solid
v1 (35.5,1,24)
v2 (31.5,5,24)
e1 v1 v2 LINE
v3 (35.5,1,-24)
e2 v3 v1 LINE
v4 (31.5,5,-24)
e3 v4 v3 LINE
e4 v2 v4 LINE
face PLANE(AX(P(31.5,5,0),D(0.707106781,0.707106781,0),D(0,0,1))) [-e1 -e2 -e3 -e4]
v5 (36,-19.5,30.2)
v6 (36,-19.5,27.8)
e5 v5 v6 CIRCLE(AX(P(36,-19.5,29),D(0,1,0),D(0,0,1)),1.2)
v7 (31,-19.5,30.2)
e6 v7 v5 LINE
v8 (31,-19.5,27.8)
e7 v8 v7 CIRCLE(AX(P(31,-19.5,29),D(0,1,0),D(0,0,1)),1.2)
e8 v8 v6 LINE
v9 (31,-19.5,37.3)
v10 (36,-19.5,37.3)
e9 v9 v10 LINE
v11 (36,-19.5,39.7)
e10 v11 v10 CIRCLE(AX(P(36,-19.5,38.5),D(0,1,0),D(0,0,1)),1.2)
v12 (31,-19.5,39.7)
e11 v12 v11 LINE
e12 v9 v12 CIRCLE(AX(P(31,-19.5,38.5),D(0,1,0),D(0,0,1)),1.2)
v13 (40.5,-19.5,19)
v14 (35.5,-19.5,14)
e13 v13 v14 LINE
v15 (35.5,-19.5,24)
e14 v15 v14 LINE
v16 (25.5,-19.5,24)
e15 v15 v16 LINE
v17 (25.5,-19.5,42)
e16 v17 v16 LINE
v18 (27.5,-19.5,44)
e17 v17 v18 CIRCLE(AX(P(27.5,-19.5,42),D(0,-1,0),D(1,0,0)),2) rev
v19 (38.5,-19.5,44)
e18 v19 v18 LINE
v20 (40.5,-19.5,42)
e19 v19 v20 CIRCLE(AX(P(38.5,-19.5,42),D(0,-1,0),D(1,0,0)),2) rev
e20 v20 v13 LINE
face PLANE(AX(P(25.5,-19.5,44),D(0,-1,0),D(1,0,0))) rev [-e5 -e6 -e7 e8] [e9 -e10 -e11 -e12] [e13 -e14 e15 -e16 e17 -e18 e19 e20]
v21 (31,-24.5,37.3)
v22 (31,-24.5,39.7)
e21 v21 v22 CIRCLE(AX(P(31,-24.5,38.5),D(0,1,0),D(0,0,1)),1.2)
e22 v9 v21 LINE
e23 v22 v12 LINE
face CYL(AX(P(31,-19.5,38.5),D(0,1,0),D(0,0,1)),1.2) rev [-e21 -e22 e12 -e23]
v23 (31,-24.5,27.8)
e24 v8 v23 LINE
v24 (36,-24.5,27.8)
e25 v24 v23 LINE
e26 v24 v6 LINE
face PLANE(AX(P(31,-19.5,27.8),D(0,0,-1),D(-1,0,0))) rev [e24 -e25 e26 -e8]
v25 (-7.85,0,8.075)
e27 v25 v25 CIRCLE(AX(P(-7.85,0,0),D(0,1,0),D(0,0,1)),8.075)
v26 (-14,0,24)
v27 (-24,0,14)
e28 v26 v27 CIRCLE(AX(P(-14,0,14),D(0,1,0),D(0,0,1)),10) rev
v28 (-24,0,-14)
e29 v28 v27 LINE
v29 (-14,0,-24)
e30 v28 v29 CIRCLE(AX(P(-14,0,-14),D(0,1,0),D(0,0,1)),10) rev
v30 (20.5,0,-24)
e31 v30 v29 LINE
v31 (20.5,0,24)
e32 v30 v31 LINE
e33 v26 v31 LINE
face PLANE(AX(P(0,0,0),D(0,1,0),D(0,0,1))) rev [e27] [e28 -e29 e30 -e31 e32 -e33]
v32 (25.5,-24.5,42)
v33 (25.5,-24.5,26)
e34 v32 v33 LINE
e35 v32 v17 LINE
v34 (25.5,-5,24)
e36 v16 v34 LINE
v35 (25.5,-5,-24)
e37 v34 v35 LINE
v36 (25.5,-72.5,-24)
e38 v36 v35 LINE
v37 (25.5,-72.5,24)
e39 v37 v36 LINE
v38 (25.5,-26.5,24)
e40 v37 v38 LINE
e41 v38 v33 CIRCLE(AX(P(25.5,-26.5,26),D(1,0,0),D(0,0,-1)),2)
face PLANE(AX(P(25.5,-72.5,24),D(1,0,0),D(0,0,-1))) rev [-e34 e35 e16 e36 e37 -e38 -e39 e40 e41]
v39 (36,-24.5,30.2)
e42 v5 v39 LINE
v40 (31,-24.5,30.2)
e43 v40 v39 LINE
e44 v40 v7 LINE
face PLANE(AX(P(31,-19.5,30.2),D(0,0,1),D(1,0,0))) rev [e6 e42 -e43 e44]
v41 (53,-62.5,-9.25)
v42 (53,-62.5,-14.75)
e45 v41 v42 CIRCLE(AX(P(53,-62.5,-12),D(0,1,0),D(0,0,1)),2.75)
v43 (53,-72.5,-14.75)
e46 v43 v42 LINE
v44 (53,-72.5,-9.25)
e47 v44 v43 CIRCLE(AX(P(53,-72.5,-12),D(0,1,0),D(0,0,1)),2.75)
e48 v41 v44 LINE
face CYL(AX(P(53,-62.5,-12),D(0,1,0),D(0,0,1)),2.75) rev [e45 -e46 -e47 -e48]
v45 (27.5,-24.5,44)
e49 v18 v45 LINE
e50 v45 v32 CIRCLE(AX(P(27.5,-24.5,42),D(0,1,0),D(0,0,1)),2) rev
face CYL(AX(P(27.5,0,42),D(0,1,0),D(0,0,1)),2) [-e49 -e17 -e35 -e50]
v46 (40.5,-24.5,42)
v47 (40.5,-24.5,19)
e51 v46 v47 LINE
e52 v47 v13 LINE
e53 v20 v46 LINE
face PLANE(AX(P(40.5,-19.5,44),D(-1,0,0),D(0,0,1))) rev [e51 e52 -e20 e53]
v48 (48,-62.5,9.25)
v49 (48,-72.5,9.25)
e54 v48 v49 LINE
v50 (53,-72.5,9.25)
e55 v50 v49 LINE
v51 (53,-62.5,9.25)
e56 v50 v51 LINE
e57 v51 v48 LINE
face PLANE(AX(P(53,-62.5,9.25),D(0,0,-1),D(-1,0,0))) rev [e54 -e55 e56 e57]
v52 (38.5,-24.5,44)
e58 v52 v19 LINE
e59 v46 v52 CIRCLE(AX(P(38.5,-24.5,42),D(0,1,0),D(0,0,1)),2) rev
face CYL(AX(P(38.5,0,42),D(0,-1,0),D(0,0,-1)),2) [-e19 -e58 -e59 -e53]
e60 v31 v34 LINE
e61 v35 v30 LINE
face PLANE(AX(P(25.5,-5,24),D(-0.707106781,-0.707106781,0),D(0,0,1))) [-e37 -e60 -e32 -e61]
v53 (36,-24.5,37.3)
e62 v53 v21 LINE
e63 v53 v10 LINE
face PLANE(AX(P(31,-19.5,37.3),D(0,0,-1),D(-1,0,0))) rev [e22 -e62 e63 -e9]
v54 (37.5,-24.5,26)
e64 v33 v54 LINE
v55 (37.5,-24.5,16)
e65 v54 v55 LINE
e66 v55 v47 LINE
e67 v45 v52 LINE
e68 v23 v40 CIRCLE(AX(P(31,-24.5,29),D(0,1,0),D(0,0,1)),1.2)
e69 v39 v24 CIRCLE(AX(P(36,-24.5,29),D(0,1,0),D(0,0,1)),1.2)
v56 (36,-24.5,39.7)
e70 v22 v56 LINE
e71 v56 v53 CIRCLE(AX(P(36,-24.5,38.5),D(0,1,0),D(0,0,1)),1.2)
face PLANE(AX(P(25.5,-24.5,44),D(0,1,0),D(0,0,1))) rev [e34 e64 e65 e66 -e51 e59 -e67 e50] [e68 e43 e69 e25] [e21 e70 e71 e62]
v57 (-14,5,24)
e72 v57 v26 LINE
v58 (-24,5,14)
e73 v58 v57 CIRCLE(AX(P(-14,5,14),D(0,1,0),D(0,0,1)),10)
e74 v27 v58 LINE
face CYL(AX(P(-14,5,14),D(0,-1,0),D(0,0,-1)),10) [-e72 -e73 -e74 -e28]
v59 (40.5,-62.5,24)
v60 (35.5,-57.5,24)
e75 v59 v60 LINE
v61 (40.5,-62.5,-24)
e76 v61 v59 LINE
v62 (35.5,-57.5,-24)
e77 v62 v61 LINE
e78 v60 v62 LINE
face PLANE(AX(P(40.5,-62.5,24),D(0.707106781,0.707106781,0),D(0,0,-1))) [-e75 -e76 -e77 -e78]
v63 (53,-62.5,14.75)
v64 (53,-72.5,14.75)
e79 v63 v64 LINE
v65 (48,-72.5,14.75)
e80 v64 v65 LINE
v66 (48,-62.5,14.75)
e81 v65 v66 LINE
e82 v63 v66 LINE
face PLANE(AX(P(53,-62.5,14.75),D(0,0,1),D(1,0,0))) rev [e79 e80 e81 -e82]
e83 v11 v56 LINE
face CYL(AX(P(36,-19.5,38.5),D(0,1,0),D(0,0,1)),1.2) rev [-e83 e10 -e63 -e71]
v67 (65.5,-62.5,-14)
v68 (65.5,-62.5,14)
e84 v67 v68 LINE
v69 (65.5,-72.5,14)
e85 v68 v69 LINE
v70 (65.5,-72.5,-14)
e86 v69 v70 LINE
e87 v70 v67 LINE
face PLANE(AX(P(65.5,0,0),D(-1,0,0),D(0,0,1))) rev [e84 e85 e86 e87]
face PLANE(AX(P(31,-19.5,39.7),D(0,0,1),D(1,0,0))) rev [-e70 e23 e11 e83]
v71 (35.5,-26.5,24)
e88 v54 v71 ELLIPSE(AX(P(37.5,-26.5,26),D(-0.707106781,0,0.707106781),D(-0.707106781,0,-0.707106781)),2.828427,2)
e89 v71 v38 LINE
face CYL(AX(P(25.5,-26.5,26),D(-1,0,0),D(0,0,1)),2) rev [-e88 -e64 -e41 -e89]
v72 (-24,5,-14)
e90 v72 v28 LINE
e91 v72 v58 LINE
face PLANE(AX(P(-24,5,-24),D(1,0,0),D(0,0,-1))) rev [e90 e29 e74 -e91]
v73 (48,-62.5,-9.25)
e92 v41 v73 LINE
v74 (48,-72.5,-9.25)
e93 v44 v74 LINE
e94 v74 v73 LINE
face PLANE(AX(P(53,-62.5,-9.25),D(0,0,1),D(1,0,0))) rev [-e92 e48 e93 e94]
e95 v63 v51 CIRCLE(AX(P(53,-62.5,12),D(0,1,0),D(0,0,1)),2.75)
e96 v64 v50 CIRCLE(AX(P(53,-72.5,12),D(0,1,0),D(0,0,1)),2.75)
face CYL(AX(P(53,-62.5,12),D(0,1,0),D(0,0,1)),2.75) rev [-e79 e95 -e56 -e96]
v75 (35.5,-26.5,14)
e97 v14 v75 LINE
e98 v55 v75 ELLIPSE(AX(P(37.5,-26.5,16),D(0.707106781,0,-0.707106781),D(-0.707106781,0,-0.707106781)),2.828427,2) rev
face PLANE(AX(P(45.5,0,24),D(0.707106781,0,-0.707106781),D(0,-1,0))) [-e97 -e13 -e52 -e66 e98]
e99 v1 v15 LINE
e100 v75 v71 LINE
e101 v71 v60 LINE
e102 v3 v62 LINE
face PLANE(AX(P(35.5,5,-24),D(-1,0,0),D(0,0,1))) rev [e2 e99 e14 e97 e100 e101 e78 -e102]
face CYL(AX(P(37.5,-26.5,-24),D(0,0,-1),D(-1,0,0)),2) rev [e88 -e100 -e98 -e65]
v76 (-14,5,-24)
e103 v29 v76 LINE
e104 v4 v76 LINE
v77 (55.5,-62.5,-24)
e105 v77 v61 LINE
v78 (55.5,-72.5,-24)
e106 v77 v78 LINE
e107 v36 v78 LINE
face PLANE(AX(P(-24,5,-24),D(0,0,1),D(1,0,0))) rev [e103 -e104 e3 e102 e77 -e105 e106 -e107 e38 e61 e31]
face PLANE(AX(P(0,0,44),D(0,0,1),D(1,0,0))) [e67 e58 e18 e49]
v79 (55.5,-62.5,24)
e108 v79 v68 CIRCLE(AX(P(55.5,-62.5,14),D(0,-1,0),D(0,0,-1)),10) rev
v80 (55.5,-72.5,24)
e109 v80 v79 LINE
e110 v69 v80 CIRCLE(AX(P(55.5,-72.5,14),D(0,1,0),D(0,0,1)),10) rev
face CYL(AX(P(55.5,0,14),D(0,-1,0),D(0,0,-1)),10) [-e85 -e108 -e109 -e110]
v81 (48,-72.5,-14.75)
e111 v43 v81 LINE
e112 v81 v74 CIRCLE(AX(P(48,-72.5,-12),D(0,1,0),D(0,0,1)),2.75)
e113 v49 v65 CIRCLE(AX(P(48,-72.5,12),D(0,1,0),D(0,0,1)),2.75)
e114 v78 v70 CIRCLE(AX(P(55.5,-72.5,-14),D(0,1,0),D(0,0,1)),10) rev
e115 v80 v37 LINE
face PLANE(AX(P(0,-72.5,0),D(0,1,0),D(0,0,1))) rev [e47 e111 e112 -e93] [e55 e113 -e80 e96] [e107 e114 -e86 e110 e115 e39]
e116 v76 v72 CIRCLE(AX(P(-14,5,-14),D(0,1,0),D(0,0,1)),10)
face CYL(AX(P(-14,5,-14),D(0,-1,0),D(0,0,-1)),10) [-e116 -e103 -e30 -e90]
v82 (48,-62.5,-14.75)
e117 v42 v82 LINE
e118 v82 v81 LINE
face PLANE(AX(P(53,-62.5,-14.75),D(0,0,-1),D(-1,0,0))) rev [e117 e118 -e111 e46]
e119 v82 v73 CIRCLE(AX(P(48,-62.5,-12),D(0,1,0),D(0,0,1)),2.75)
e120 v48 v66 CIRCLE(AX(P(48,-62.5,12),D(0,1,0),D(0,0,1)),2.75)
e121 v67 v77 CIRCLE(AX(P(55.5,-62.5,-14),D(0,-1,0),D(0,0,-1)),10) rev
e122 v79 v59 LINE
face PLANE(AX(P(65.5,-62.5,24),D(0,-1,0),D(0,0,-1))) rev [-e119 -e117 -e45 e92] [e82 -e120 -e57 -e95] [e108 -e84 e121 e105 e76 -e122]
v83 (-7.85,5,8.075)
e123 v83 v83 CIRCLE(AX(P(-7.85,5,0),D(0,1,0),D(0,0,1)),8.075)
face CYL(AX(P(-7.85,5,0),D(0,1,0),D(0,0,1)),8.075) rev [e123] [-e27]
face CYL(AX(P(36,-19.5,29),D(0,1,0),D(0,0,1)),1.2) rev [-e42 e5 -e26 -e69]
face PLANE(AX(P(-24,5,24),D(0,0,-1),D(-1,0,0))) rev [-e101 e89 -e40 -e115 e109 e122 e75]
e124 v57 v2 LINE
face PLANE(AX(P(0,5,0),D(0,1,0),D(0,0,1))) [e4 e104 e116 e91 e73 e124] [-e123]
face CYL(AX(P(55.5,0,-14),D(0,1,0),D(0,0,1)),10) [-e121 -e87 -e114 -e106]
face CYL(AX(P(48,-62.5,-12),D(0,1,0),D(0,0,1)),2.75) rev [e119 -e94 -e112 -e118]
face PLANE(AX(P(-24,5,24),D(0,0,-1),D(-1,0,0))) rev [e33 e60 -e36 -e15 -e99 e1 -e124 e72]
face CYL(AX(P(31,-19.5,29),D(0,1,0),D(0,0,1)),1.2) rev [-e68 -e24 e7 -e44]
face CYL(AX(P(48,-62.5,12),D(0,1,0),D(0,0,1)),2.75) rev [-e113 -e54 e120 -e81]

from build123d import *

# Parameters (mm, degrees)
SKETCH1_W                 = 59.5
SKETCH1_H                 = 48
BOSS_EXTRUDE1_DEPTH       = 5
SKETCH2_W                 = 10
SKETCH2_H                 = 48
BOSS_EXTRUDE2_DEPTH       = 72.5
SKETCH3_W                 = 48
SKETCH3_H                 = 10
BOSS_EXTRUDE3_DEPTH       = 30
FILLET1_R                 = 10
F_1_0MM_START             = -72.5
F_1_0MM_DOWEL_SLOT1_DEPTH = 10
FILLET2_R                 = 10
M6_CLEARANCE_HOLE1_D      = 16.15
CHAMFER1_SIZE             = 5
CHAMFER2_SIZE             = 4
SKETCH14_W                = 15
SKETCH14_H                = 5
BOSS_EXTRUDE4_DEPTH       = 20
CHAMFER3_SIZE             = 10
FILLET3_R                 = 2
M2_START                  = -24.5
M2_CLEARANCE_SLOT1_DEPTH  = 5


# Read off the part's stored shape, not the designer's step: Ø1.0mm Dowel Slot1, M2 Clearance Slot1
with BuildPart() as part:
    # Sketch1 → Boss-Extrude1 (new body)
    with BuildSketch(Plane(origin=(0, 0, 0), x_dir=(1, 0, 0), z_dir=(0, 1, 0))):
        with Locations((5.75, 0)):
            Rectangle(SKETCH1_W, SKETCH1_H)
    extrude(amount=BOSS_EXTRUDE1_DEPTH)

    # Sketch2 → Boss-Extrude2 (add)
    with BuildSketch(Plane.XZ):
        with Locations((30.5, 0)):
            Rectangle(SKETCH2_W, SKETCH2_H)
    extrude(amount=BOSS_EXTRUDE2_DEPTH)

    # Sketch3 → Boss-Extrude3 (add)
    with BuildSketch(Plane(origin=(35.5, 0, 0), x_dir=(0, 0, -1), z_dir=(1, 0, 0))):
        with Locations((0, -67.5)):
            Rectangle(SKETCH3_W, SKETCH3_H)
    extrude(amount=BOSS_EXTRUDE3_DEPTH)

    # Fillet1
    fillet1_edges = [part.edges().sort_by_distance(p)[0] for p in [
        (-24, 2.5, -24),
        (-24, 2.5, 24),
    ]]
    fillet(fillet1_edges, radius=FILLET1_R)

    # Ø1.0mm Dowel Slot1 outline → Ø1.0mm Dowel Slot1 (cut)
    with BuildSketch(Plane(origin=(0, 0, 0), x_dir=(1, 0, 0), z_dir=(0, 1, 0)).offset(F_1_0MM_START)):
        with BuildLine():
            Line((53, 14.75), (48, 14.75))
            ThreePointArc((48, 14.75), (45.25, 12), (48, 9.25))
            Line((48, 9.25), (53, 9.25))
            ThreePointArc((53, 9.25), (55.75, 12), (53, 14.75))
        make_face()
        with BuildLine():
            Line((53, -9.25), (48, -9.25))
            ThreePointArc((48, -9.25), (45.25, -12), (48, -14.75))
            Line((48, -14.75), (53, -14.75))
            ThreePointArc((53, -14.75), (55.75, -12), (53, -9.25))
        make_face()
    extrude(amount=F_1_0MM_DOWEL_SLOT1_DEPTH, mode=Mode.SUBTRACT)

    # Fillet2
    fillet2_edges = [part.edges().sort_by_distance(p)[0] for p in [
        (65.5, -67.5, 24),
        (65.5, -67.5, -24),
    ]]
    fillet(fillet2_edges, radius=FILLET2_R)

    # M6 Clearance Hole1 (through all)
    with Locations(Plane(origin=(0, 5, 0), x_dir=(1, 0, 0), z_dir=(0, 1, 0))):
        with Locations((-7.85, 0)):
            Hole(M6_CLEARANCE_HOLE1_D / 2)

    # Chamfer1
    chamfer1_edges = [part.edges().sort_by_distance(p)[0] for p in [
        (25.5, 0, 0),
        (35.5, -62.5, 0),
    ]]
    chamfer(chamfer1_edges, length=CHAMFER1_SIZE)

    # Chamfer2
    chamfer2_edges = [part.edges().sort_by_distance(p)[0] for p in [
        (35.5, 5, 0),
    ]]
    chamfer(chamfer2_edges, length=CHAMFER2_SIZE)

    # Sketch14 → Boss-Extrude4 (add)
    with BuildSketch(Plane.XY.offset(24)):
        with Locations((33, -22)):
            Rectangle(SKETCH14_W, SKETCH14_H)
    extrude(amount=BOSS_EXTRUDE4_DEPTH)

    # Chamfer3
    # the kernel refuses this chamfer: 10 mm, written as the material it adds along each edge
    with BuildSketch(Plane(origin=(35.5, -19.5, 24), x_dir=(-0.027495876610586317, 0, -0.9996219169112968), z_dir=(0, -1, 0))) as chamfer3_piece_1_section:
        Polygon((CHAMFER3_SIZE * 0.999621916911, CHAMFER3_SIZE * 0.0274958766106), (-CHAMFER3_SIZE * 0.0274958766106, CHAMFER3_SIZE * 0.999621916911), (0, 0), align=None)
    chamfer3_piece_1 = extrude(amount=5, mode=Mode.PRIVATE)
    chamfer3_piece_1 = split(chamfer3_piece_1, bisect_by=Plane(origin=(40.5, -22, 20.111111111), z_dir=(-1, 0, 0)), keep=Keep.TOP, mode=Mode.PRIVATE)
    add(chamfer3_piece_1)

    # Fillet3
    fillet3_edges = [part.edges().sort_by_distance(p)[0] for p in [
        (30.5, -24.5, 24),
        (25.5, -22, 44),
        (40.5, -22, 44),
        (35.5, -24.5, 19),
    ]]
    fillet(fillet3_edges, radius=FILLET3_R)

    # M2 Clearance Slot1 outline → M2 Clearance Slot1 (cut)
    with BuildSketch(Plane(origin=(0, 0, 0), x_dir=(1, 0, 0), z_dir=(0, 1, 0)).offset(M2_START)):
        with BuildLine():
            Line((31, -30.2), (36, -30.2))
            ThreePointArc((36, -30.2), (37.2, -29), (36, -27.8))
            Line((36, -27.8), (31, -27.8))
            ThreePointArc((31, -27.8), (29.8, -29), (31, -30.2))
        make_face()
        with BuildLine():
            Line((31, -39.7), (36, -39.7))
            ThreePointArc((36, -39.7), (37.2, -38.5), (36, -37.3))
            Line((36, -37.3), (31, -37.3))
            ThreePointArc((31, -37.3), (29.8, -38.5), (31, -39.7))
        make_face()
    extrude(amount=M2_CLEARANCE_SLOT1_DEPTH, mode=Mode.SUBTRACT)


solid = part.part
